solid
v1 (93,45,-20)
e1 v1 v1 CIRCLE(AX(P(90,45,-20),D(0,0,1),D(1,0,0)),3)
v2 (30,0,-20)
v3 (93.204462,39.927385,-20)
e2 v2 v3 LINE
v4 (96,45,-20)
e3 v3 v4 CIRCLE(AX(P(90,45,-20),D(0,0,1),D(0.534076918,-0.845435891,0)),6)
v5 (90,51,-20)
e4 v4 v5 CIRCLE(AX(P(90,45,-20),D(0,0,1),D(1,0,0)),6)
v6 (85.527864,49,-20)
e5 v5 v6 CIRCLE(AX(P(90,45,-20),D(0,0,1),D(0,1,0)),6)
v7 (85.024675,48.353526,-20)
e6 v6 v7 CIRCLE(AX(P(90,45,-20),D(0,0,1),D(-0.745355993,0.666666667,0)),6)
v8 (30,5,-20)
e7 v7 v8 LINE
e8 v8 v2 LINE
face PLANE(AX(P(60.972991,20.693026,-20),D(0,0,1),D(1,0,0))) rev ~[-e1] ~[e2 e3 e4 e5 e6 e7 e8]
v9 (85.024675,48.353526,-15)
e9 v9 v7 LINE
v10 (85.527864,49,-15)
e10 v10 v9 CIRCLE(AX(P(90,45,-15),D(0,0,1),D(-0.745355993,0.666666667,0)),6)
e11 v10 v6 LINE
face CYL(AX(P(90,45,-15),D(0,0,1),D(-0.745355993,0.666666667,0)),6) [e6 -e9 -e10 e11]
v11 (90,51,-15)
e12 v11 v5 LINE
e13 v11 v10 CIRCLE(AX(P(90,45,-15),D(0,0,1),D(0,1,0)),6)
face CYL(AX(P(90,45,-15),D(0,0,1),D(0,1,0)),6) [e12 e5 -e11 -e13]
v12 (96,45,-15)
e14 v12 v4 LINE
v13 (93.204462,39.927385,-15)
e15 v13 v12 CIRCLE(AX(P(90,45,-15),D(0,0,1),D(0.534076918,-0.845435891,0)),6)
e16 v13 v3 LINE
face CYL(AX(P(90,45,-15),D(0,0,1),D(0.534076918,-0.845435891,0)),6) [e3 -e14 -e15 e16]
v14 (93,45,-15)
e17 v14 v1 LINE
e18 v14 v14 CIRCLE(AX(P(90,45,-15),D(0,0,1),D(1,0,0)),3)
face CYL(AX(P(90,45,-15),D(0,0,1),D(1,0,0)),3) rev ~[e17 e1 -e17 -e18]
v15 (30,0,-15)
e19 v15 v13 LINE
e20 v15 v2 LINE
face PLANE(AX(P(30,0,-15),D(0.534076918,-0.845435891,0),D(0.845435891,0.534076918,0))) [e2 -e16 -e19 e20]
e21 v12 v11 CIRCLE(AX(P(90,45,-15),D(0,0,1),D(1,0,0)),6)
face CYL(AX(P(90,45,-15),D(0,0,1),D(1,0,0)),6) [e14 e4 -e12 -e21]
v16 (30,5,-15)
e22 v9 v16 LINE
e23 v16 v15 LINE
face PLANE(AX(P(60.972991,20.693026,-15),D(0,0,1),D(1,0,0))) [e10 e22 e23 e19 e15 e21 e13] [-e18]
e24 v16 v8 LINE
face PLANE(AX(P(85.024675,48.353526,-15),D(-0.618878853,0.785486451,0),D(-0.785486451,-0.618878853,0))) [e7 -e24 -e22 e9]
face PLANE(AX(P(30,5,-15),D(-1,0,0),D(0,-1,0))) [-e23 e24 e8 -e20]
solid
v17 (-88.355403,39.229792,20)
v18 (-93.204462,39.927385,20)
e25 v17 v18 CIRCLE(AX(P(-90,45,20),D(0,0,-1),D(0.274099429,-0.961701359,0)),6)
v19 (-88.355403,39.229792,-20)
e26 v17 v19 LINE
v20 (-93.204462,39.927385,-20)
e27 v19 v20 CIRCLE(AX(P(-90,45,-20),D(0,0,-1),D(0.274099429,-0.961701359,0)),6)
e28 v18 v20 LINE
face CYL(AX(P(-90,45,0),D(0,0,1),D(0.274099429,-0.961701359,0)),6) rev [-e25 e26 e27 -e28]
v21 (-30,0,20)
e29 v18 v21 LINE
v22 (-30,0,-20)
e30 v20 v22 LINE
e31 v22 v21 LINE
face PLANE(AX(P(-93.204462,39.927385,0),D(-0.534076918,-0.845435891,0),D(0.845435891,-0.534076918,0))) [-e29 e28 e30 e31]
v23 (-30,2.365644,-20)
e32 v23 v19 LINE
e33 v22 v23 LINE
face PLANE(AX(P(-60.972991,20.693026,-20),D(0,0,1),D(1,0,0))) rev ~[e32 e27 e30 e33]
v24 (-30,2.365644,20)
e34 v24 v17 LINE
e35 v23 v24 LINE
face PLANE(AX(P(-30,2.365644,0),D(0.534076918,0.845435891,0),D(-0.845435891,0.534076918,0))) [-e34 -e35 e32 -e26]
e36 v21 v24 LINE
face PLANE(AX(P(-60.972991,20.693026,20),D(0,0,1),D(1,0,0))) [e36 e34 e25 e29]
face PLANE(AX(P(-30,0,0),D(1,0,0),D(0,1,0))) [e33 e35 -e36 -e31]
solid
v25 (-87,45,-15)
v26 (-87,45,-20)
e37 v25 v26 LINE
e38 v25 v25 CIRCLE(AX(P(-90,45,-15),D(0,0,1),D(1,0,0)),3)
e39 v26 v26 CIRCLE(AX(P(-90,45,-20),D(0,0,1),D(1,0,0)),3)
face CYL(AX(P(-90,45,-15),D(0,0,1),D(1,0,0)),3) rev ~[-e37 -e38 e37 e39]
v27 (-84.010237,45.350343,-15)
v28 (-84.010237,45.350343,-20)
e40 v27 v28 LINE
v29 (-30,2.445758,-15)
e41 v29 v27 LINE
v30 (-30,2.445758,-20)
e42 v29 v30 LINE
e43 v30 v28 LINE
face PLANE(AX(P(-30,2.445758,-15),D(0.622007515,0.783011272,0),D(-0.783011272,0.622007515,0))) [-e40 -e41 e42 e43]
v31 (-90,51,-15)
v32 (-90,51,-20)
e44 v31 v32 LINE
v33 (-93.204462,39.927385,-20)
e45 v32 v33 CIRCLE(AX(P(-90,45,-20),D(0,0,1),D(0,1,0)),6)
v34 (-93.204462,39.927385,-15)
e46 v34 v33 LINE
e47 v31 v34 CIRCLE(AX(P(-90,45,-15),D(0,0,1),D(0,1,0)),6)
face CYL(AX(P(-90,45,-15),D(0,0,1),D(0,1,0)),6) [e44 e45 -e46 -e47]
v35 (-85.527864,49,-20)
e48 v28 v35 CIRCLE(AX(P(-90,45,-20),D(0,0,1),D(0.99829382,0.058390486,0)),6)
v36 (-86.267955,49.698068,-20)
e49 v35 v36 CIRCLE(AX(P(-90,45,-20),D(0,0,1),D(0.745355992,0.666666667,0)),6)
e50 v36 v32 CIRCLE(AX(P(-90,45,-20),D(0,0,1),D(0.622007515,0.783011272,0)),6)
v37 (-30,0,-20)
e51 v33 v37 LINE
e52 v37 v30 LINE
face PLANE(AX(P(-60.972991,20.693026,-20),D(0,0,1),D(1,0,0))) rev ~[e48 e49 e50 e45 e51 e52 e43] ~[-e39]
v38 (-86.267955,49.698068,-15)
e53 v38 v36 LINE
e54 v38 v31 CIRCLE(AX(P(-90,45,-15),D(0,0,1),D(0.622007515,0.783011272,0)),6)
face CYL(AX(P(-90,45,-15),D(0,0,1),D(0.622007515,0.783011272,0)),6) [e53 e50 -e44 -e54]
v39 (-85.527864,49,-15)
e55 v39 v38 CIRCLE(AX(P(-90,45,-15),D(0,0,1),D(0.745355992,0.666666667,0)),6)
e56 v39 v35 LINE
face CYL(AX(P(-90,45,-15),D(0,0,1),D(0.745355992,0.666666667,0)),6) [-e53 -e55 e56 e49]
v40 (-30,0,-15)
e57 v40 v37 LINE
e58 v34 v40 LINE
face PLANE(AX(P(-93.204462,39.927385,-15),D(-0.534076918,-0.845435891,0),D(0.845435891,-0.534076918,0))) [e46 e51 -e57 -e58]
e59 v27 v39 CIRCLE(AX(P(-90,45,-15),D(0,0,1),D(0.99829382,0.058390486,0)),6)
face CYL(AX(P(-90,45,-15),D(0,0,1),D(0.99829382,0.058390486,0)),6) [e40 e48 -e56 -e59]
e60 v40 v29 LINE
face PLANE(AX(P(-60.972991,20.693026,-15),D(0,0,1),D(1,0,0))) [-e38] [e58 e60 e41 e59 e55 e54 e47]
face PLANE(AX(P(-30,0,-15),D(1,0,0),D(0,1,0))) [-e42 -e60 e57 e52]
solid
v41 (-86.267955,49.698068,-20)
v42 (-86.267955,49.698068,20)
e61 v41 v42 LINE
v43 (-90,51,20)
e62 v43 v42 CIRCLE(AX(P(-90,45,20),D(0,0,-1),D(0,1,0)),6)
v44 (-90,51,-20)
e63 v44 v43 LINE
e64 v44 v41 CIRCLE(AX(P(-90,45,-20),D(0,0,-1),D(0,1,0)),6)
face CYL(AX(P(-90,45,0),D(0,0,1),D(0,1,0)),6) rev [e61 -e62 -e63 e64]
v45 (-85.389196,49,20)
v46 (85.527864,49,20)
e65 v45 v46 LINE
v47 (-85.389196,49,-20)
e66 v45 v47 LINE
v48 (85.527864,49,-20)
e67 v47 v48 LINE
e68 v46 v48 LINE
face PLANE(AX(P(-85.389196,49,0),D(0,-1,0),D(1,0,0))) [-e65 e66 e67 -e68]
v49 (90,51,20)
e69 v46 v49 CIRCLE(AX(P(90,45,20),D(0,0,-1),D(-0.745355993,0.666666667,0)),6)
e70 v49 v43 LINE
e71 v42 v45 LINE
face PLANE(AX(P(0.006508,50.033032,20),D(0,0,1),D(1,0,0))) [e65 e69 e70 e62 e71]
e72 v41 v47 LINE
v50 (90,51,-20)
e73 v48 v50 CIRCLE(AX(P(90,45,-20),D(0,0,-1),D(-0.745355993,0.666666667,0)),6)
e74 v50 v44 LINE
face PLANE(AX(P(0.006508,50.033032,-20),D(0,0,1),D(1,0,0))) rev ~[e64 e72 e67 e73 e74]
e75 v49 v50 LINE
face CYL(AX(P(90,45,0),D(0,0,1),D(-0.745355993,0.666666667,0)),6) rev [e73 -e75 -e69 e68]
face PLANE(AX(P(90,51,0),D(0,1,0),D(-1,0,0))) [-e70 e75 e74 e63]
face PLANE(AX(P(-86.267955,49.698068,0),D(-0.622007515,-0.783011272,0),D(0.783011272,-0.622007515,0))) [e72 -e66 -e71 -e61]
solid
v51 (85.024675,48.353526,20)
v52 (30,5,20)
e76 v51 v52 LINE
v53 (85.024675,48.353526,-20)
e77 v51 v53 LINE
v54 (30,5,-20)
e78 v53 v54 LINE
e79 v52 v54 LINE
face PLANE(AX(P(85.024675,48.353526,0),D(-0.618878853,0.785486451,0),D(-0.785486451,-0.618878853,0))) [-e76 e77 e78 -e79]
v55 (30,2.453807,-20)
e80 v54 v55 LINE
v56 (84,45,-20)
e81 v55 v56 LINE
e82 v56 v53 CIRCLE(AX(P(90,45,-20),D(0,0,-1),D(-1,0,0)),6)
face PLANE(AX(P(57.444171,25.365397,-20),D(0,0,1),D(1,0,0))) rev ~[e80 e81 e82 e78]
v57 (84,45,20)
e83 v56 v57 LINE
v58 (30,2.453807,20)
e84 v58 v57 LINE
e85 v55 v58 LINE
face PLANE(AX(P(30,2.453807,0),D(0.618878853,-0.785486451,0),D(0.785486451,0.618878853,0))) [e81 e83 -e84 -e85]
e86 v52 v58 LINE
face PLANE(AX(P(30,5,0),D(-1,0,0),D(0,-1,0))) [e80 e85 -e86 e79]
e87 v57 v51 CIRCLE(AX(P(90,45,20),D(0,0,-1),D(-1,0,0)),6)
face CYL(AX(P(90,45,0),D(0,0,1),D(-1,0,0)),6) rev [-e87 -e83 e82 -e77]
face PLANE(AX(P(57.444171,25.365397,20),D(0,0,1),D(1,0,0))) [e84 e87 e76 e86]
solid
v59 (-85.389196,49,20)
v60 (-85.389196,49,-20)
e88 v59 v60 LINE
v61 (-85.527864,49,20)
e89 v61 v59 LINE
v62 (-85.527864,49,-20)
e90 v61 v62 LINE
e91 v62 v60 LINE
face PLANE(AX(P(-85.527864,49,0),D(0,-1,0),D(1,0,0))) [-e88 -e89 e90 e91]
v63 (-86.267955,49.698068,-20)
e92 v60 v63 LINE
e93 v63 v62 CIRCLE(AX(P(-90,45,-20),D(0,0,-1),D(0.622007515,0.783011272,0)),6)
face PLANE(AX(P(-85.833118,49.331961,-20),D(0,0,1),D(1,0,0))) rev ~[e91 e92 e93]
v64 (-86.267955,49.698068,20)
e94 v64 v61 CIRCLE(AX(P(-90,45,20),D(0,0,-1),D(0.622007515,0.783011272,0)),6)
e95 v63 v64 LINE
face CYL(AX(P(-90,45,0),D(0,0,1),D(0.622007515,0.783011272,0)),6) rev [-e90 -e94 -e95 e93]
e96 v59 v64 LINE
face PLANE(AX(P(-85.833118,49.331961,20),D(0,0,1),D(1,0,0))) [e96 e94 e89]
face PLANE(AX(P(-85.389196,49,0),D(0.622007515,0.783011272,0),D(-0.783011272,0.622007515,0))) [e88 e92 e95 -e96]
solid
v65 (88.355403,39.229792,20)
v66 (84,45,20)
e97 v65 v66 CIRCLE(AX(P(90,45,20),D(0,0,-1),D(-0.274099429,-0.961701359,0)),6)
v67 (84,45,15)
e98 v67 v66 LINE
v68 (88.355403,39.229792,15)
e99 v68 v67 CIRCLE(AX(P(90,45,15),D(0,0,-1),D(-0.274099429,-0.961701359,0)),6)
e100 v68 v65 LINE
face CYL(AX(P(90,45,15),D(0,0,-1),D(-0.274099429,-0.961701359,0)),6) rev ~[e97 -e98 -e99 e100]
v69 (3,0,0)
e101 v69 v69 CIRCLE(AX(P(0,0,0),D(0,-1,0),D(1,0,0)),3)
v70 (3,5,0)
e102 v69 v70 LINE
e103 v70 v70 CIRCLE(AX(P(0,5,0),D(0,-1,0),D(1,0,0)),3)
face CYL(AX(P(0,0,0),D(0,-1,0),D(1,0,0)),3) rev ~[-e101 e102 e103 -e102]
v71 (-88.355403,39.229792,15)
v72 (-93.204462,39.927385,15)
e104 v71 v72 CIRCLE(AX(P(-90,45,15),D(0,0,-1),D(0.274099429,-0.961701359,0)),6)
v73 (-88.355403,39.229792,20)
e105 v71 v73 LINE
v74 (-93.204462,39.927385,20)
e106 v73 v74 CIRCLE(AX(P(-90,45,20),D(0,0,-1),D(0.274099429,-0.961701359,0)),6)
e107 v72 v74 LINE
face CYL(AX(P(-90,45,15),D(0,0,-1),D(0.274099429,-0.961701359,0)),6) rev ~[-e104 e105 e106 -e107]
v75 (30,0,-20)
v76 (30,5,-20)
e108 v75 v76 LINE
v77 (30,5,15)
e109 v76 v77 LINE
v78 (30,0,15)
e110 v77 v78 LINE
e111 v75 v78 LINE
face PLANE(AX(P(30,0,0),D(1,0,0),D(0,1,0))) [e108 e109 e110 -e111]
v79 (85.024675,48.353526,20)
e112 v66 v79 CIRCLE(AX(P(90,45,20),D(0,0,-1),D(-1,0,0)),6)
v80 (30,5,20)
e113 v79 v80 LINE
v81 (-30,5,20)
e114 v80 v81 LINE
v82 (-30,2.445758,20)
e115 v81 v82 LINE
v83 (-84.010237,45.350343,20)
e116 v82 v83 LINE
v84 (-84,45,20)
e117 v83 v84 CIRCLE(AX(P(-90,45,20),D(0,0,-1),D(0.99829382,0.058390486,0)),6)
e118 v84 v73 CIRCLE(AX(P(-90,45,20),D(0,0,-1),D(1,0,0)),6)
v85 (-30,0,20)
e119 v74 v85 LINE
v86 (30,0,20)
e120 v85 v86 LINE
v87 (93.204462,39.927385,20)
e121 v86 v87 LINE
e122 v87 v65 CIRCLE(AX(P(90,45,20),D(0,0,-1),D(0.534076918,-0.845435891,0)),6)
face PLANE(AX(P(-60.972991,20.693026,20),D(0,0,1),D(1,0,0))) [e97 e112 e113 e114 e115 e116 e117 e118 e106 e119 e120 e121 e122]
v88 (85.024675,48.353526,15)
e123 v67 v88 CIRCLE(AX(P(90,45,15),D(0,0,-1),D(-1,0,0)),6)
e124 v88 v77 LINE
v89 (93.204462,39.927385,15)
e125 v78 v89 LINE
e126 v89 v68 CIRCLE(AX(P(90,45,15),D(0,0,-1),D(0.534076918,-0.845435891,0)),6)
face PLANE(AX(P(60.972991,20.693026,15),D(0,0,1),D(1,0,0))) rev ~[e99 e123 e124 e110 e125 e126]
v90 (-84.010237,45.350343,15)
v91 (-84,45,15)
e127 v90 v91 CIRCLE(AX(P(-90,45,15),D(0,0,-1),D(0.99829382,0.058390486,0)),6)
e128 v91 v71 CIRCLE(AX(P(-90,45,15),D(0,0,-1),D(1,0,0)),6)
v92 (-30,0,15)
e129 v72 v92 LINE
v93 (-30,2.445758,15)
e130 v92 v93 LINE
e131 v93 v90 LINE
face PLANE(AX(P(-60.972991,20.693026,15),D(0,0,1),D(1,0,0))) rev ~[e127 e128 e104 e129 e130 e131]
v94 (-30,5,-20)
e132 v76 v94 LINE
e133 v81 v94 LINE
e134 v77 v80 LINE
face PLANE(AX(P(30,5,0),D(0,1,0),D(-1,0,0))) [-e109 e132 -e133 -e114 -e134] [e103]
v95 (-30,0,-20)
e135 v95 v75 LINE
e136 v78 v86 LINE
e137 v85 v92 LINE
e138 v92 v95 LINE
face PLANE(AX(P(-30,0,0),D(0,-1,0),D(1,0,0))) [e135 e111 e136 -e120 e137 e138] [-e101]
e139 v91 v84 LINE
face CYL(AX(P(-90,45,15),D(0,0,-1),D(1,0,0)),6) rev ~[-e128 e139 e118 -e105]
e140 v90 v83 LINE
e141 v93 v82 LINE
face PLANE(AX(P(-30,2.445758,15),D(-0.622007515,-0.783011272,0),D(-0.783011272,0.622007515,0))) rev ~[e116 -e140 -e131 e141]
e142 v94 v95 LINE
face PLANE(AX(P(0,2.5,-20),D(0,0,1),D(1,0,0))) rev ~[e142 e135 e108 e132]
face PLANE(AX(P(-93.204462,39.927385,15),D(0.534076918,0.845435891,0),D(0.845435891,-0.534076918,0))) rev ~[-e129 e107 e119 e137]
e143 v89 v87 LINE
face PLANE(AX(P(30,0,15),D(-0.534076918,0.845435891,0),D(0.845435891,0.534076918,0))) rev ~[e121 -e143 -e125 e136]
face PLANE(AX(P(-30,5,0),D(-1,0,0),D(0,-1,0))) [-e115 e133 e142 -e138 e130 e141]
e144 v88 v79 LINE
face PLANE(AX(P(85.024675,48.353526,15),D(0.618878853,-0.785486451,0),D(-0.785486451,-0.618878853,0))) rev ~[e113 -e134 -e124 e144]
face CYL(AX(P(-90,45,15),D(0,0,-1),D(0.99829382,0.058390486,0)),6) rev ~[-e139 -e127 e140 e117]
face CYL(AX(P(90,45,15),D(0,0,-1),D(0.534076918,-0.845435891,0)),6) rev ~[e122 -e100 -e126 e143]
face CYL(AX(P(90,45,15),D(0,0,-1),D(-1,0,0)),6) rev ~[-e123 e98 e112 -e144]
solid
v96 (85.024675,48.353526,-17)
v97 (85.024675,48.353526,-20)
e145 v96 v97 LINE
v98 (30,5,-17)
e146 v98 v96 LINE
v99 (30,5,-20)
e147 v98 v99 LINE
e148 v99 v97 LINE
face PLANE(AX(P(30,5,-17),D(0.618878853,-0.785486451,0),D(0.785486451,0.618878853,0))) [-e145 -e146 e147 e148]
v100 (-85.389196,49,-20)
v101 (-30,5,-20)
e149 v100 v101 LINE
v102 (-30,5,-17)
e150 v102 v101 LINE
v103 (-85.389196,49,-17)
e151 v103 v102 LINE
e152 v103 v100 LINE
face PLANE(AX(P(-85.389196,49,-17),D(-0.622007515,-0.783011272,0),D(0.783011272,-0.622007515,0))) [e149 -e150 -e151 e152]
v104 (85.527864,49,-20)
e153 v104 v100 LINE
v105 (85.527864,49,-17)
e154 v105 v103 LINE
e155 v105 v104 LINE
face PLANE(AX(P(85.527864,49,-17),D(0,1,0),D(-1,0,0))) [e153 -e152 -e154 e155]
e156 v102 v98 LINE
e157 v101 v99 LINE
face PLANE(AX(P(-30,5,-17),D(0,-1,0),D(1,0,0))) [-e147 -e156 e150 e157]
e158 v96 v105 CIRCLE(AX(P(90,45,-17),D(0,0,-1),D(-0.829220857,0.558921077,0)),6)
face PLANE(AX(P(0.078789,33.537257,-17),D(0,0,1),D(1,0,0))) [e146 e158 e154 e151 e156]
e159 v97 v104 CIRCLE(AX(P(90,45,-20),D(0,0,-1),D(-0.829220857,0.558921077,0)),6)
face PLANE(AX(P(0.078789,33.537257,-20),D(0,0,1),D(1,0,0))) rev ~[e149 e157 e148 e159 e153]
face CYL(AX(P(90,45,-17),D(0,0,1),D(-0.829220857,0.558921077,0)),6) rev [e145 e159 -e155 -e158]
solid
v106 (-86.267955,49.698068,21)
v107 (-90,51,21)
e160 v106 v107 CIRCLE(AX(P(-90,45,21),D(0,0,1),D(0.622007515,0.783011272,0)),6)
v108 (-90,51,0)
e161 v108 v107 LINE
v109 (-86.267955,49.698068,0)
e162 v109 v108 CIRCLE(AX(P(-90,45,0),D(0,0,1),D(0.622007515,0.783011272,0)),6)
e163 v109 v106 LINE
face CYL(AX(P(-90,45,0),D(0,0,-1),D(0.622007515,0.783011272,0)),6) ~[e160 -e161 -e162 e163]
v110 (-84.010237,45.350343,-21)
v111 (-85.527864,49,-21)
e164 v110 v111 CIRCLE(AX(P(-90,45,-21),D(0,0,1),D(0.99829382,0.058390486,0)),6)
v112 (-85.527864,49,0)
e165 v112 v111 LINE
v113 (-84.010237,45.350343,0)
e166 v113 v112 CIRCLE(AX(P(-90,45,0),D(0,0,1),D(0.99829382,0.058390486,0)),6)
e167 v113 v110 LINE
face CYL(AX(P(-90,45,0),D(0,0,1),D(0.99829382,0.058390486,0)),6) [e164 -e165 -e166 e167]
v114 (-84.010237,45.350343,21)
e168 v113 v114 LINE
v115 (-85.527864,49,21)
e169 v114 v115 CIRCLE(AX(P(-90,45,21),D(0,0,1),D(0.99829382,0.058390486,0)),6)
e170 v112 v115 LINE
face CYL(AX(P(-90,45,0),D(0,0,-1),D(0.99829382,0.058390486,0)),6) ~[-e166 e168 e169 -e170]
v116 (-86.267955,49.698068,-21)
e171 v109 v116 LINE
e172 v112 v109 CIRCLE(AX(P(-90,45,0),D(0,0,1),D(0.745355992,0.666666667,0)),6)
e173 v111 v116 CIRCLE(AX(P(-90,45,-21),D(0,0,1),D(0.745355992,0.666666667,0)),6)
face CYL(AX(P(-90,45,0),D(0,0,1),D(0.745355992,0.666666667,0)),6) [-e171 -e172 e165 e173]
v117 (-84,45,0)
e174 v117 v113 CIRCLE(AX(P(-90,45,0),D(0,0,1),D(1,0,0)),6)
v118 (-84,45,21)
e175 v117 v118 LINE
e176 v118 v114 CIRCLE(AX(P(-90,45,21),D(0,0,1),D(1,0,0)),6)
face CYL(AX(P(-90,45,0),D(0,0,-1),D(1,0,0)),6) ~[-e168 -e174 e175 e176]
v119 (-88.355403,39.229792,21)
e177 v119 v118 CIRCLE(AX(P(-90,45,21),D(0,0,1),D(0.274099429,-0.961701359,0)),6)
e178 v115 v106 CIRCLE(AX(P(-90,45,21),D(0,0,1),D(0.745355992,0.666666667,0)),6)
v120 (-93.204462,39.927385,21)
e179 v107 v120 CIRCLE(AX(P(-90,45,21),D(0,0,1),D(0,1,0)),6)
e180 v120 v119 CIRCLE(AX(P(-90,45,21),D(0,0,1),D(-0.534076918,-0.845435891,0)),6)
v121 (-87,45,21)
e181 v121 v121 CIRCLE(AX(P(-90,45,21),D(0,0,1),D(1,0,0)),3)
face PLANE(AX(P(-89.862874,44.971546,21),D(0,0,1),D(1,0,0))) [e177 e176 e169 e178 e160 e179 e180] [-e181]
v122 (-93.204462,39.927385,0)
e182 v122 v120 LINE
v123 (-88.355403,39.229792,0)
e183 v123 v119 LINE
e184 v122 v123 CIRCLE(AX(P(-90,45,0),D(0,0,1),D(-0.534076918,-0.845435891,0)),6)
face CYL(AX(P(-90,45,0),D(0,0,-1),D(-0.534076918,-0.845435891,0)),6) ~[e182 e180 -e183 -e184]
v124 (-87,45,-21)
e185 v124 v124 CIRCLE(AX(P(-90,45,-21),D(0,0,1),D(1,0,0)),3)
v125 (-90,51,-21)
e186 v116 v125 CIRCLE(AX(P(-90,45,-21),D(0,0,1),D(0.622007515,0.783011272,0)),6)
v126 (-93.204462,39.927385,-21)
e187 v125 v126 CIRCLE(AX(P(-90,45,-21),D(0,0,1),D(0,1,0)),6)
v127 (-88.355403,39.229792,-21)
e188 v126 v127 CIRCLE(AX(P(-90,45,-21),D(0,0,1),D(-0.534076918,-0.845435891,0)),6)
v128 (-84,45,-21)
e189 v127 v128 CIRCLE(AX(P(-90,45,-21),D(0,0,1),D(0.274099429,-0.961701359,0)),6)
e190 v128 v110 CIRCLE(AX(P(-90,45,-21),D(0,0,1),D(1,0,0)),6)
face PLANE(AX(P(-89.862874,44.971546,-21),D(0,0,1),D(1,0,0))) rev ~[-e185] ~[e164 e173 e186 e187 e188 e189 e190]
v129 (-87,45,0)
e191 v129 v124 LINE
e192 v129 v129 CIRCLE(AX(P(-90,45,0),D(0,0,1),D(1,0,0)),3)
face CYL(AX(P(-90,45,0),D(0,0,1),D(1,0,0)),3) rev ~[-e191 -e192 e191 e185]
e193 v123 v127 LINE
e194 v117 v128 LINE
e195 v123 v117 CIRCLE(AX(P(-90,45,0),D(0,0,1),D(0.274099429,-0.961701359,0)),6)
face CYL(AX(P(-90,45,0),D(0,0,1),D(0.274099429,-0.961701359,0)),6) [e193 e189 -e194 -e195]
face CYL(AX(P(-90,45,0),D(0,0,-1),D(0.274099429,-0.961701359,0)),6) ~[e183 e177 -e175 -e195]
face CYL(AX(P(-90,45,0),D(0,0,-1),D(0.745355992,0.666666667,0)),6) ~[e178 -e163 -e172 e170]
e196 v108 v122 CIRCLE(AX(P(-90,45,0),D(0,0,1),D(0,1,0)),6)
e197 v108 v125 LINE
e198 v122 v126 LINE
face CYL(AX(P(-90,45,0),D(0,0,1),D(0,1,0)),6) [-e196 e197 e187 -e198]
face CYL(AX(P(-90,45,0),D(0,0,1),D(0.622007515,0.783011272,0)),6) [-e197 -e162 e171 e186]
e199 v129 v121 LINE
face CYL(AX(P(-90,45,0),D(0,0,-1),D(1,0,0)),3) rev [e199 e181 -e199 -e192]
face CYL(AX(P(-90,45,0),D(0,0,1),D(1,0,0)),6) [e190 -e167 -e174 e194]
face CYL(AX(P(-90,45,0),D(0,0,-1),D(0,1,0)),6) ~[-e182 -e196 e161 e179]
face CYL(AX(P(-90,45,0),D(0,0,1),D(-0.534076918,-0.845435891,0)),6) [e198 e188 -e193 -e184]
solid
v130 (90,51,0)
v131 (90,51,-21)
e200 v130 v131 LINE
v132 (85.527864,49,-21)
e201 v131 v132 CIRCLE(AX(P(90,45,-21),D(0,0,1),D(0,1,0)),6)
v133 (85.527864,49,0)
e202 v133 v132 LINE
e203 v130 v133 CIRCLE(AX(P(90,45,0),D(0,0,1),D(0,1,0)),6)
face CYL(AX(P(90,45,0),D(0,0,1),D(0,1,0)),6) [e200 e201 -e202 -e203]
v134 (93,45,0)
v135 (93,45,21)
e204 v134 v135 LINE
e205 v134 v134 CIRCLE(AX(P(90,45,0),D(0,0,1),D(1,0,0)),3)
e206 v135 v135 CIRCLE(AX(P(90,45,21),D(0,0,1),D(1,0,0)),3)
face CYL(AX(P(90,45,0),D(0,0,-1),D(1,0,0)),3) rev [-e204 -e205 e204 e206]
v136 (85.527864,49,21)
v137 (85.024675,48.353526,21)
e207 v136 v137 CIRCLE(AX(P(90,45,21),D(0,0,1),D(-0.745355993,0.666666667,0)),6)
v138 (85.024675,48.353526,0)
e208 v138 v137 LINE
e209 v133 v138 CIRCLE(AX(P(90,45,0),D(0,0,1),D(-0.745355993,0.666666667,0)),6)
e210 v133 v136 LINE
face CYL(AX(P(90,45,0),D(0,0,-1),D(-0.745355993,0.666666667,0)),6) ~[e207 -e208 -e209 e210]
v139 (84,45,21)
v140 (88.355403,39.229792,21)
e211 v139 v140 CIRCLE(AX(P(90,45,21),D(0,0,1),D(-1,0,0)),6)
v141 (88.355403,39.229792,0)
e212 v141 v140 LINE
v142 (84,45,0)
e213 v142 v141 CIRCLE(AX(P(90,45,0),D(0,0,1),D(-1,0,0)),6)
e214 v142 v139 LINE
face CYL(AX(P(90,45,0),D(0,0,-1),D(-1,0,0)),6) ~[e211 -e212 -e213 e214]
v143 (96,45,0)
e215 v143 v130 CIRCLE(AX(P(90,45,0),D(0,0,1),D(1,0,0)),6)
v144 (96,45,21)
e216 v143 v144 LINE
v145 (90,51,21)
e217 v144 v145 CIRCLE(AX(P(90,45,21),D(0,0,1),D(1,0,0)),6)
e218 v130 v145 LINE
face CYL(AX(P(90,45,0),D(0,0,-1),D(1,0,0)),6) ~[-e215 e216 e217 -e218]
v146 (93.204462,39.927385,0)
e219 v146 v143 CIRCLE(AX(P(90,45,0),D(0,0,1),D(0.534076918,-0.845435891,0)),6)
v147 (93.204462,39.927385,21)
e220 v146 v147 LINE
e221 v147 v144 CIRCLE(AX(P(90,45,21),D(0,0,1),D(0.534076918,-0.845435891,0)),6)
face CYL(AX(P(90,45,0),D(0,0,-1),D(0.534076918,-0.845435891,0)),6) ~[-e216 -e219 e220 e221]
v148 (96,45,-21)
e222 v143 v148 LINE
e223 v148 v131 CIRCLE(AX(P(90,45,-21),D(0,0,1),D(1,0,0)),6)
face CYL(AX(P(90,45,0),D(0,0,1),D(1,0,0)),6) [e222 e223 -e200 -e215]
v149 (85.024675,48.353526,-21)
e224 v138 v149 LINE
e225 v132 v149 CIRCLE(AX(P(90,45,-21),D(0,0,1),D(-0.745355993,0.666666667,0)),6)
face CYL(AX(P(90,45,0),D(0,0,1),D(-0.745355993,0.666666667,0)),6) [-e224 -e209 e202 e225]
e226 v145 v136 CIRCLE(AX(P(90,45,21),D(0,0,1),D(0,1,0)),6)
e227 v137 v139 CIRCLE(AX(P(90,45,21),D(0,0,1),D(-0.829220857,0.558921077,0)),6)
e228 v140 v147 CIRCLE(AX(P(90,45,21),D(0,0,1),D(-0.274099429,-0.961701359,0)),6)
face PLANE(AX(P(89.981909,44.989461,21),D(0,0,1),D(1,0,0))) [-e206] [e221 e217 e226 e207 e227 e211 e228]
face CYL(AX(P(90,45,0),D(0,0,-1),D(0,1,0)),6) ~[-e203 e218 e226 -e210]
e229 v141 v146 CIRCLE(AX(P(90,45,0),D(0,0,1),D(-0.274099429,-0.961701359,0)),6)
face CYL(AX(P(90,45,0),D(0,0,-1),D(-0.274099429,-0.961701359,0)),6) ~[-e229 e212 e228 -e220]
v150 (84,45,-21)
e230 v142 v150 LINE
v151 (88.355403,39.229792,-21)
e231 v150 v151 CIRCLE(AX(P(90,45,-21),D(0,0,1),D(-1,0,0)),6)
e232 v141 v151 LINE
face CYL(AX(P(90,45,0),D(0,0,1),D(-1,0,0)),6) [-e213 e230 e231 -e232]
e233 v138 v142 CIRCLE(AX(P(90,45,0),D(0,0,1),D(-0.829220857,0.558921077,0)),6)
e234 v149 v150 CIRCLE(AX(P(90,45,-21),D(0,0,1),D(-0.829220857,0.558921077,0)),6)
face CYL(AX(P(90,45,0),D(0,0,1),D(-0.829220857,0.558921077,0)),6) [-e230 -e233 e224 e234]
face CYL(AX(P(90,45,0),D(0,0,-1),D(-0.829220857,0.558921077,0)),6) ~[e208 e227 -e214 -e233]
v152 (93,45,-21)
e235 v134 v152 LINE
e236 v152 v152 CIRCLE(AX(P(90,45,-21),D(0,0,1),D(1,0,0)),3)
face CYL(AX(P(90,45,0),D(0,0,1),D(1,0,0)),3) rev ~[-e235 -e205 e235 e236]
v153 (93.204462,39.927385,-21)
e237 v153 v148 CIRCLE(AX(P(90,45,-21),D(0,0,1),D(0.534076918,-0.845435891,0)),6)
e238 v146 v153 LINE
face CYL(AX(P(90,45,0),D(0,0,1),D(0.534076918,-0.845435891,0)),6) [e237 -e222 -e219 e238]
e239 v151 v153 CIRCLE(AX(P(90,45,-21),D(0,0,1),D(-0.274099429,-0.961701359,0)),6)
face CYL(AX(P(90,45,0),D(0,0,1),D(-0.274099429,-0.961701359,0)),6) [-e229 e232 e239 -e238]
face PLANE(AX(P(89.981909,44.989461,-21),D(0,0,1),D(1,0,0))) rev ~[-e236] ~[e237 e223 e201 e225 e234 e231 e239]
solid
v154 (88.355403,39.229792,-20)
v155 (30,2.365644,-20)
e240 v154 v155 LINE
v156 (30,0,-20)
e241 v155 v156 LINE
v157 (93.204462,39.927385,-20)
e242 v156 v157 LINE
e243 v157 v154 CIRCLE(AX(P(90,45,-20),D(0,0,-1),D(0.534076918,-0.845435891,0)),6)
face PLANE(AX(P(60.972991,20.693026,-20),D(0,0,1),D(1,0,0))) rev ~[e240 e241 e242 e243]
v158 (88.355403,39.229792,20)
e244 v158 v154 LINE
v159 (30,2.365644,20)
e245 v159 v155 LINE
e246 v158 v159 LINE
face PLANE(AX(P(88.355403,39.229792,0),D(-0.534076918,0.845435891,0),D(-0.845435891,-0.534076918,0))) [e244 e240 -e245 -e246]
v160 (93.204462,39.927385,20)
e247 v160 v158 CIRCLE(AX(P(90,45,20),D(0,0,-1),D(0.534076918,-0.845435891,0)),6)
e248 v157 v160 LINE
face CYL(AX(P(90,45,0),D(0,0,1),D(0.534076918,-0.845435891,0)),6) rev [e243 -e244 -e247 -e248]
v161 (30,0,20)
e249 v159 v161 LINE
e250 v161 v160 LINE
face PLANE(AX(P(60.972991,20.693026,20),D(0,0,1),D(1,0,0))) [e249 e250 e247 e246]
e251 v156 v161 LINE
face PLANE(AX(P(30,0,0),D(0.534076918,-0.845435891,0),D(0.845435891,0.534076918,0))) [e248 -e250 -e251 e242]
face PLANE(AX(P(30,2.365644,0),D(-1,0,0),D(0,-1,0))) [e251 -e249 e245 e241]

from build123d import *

# Parameters (mm, degrees)
F1_START      = -15
F0_R          = 3
F1_DEPTH      = 5
F2_DEPTH      = 20
F3_START      = -17
F3_DEPTH      = 3
F4_START      = 15
F4_DEPTH      = 5
F5_DEPTH      = 21
F5_DEPTH_BACK = 21
F6_R          = 3
F7_DEPTH      = 5
F8_DEPTH      = 20
F8_DEPTH_BACK = 20
F9_DEPTH      = 20
F9_DEPTH_BACK = 20


with BuildPart() as f1:
    # F0 (on Top) → F1 (new body)
    with BuildSketch(Plane.XY.offset(F1_START)):
        with BuildLine():
            Line((-93.2044615088, 39.927384655), (-30, 0))
            Line((-30, 0), (-30, 2.3656435948))
            Line((-30, 2.3656435948), (-88.3554034274, 39.2297918483))
            ThreePointArc((-88.3554034274, 39.2297918483), (-90.8543732122, 39.0611409838), (-93.2044615088, 39.927384655))
        make_face()
        with BuildLine():
            Line((-88.3554034274, 39.2297918483), (-30, 2.3656435948))
            Line((-30, 2.3656435948), (-30, 2.4457583538))
            Line((-30, 2.4457583538), (-84.0102370798, 45.3503429172))
            ThreePointArc((-84.0102370798, 45.3503429172), (-84.002559816, 45.175246225), (-84, 45))
            ThreePointArc((-84, 45), (-85.2110763508, 41.3852786716), (-88.3554034274, 39.2297918483))
        make_face()
        with BuildLine():
            ThreePointArc((-90, 51), (-95.7634925206, 46.6679790061), (-93.2044615088, 39.927384655))
            ThreePointArc((-93.2044615088, 39.927384655), (-90.8543732122, 39.0611409838), (-88.3554034274, 39.2297918483))
            ThreePointArc((-88.3554034274, 39.2297918483), (-85.2110763508, 41.3852786716), (-84, 45))
            ThreePointArc((-84, 45), (-84.002559816, 45.175246225), (-84.0102370798, 45.3503429172))
            ThreePointArc((-84.0102370798, 45.3503429172), (-84.4598888798, 47.3037293191), (-85.527864045, 49))
            ThreePointArc((-85.527864045, 49), (-85.8830871702, 49.3647484179), (-86.2679549126, 49.698067631))
            ThreePointArc((-86.2679549126, 49.698067631), (-88.0236910396, 50.6651745686), (-90, 51))
        make_face()
        with Locations((-90, 45)):
            Circle(F0_R, mode=Mode.SUBTRACT)
    extrude(amount=-F1_DEPTH)


with BuildPart() as f1b:
    # F0 (on Top) → F1, piece 2 (new body)
    with BuildSketch(Plane.XY.offset(F1_START)):
        with BuildLine():
            Line((30, 2.3656435948), (30, 0))
            Line((30, 0), (93.2044615088, 39.927384655))
            ThreePointArc((93.2044615088, 39.927384655), (90.8543732122, 39.0611409838), (88.3554034274, 39.2297918483))
            Line((88.3554034274, 39.2297918483), (30, 2.3656435948))
        make_face()
        with BuildLine():
            Line((30, 2.4538071327), (30, 2.3656435948))
            Line((30, 2.3656435948), (88.3554034274, 39.2297918483))
            ThreePointArc((88.3554034274, 39.2297918483), (85.2110763508, 41.3852786716), (84, 45))
            Line((84, 45), (30, 2.4538071327))
        make_face()
        with BuildLine():
            ThreePointArc((88.3554034274, 39.2297918483), (90.8543732122, 39.0611409838), (93.2044615088, 39.927384655))
            ThreePointArc((93.2044615088, 39.927384655), (95.2548439107, 42.1040346215), (96, 45))
            ThreePointArc((96, 45), (94.2426406871, 49.2426406871), (90, 51))
            ThreePointArc((90, 51), (87.5505102572, 50.4772255751), (85.527864045, 49))
            ThreePointArc((85.527864045, 49), (85.2652230991, 48.6853612711), (85.0246748585, 48.3535264627))
            ThreePointArc((85.0246748585, 48.3535264627), (84.261883983, 46.7532896439), (84, 45))
            ThreePointArc((84, 45), (85.2110763508, 41.3852786716), (88.3554034274, 39.2297918483))
        make_face()
        with Locations((90, 45)):
            Circle(F0_R, mode=Mode.SUBTRACT)
        with BuildLine():
            Line((30, 5), (30, 2.4538071327))
            Line((30, 2.4538071327), (84, 45))
            ThreePointArc((84, 45), (84.261883983, 46.7532896439), (85.0246748585, 48.3535264627))
            Line((85.0246748585, 48.3535264627), (30, 5))
        make_face()
    extrude(amount=-F1_DEPTH)


with BuildPart() as f2:
    # F0 (on Top) → F2 (new body, symmetric)
    with BuildSketch(Plane.XY):
        Polygon((-30, 2.3656435948), (-30, 0), (30, 0), (30, 2.3656435948), (30, 2.4538071327), (30, 5), (-30, 5), (-30, 2.4457583538), align=None)
    extrude(amount=F2_DEPTH, both=True)

    # F0 (on Top) → F4 (join)
    with BuildSketch(Plane.XY.offset(F4_START)):
        with BuildLine():
            Line((-93.2044615088, 39.927384655), (-30, 0))
            Line((-30, 0), (-30, 2.3656435948))
            Line((-30, 2.3656435948), (-88.3554034274, 39.2297918483))
            ThreePointArc((-88.3554034274, 39.2297918483), (-90.8543732122, 39.0611409838), (-93.2044615088, 39.927384655))
        make_face()
        with BuildLine():
            Line((30, 2.3656435948), (30, 0))
            Line((30, 0), (93.2044615088, 39.927384655))
            ThreePointArc((93.2044615088, 39.927384655), (90.8543732122, 39.0611409838), (88.3554034274, 39.2297918483))
            Line((88.3554034274, 39.2297918483), (30, 2.3656435948))
        make_face()
        with BuildLine():
            Line((-88.3554034274, 39.2297918483), (-30, 2.3656435948))
            Line((-30, 2.3656435948), (-30, 2.4457583538))
            Line((-30, 2.4457583538), (-84.0102370798, 45.3503429172))
            ThreePointArc((-84.0102370798, 45.3503429172), (-84.002559816, 45.175246225), (-84, 45))
            ThreePointArc((-84, 45), (-85.2110763508, 41.3852786716), (-88.3554034274, 39.2297918483))
        make_face()
        with BuildLine():
            Line((30, 2.4538071327), (30, 2.3656435948))
            Line((30, 2.3656435948), (88.3554034274, 39.2297918483))
            ThreePointArc((88.3554034274, 39.2297918483), (85.2110763508, 41.3852786716), (84, 45))
            Line((84, 45), (30, 2.4538071327))
        make_face()
        with BuildLine():
            Line((30, 5), (30, 2.4538071327))
            Line((30, 2.4538071327), (84, 45))
            ThreePointArc((84, 45), (84.261883983, 46.7532896439), (85.0246748585, 48.3535264627))
            Line((85.0246748585, 48.3535264627), (30, 5))
        make_face()
    extrude(amount=F4_DEPTH)

    # F6 (on Front) → F7 (cut)
    with BuildSketch(Plane.XZ):
        Circle(F6_R)
    extrude(amount=-F7_DEPTH, mode=Mode.SUBTRACT)


with BuildPart() as f3:
    # F0 (on Top) → F3 (new body)
    with BuildSketch(Plane.XY.offset(F3_START)):
        with BuildLine():
            Line((-85.3891957163, 49), (-30, 5))
            Line((-30, 5), (30, 5))
            Line((30, 5), (85.0246748585, 48.3535264627))
            ThreePointArc((85.0246748585, 48.3535264627), (85.2652230991, 48.6853612711), (85.527864045, 49))
            Line((85.527864045, 49), (-85.3891957163, 49))
        make_face()
    extrude(amount=-F3_DEPTH)


with BuildPart() as f5:
    # F0 (on Top) → F5 (new body, two sides)
    with BuildSketch(Plane.XY) as f5_sk:
        with BuildLine():
            ThreePointArc((-90, 51), (-95.7634925206, 46.6679790061), (-93.2044615088, 39.927384655))
            ThreePointArc((-93.2044615088, 39.927384655), (-90.8543732122, 39.0611409838), (-88.3554034274, 39.2297918483))
            ThreePointArc((-88.3554034274, 39.2297918483), (-85.2110763508, 41.3852786716), (-84, 45))
            ThreePointArc((-84, 45), (-84.002559816, 45.175246225), (-84.0102370798, 45.3503429172))
            ThreePointArc((-84.0102370798, 45.3503429172), (-84.4598888798, 47.3037293191), (-85.527864045, 49))
            ThreePointArc((-85.527864045, 49), (-85.8830871702, 49.3647484179), (-86.2679549126, 49.698067631))
            ThreePointArc((-86.2679549126, 49.698067631), (-88.0236910396, 50.6651745686), (-90, 51))
        make_face()
        with Locations((-90, 45)):
            Circle(F0_R, mode=Mode.SUBTRACT)
    extrude(amount=F5_DEPTH)
    extrude(f5_sk.sketch, amount=-F5_DEPTH_BACK)


with BuildPart() as f5b:
    # F0 (on Top) → F5, piece 2 (new body, two sides)
    with BuildSketch(Plane.XY) as f5_2_sk:
        with BuildLine():
            ThreePointArc((88.3554034274, 39.2297918483), (90.8543732122, 39.0611409838), (93.2044615088, 39.927384655))
            ThreePointArc((93.2044615088, 39.927384655), (95.2548439107, 42.1040346215), (96, 45))
            ThreePointArc((96, 45), (94.2426406871, 49.2426406871), (90, 51))
            ThreePointArc((90, 51), (87.5505102572, 50.4772255751), (85.527864045, 49))
            ThreePointArc((85.527864045, 49), (85.2652230991, 48.6853612711), (85.0246748585, 48.3535264627))
            ThreePointArc((85.0246748585, 48.3535264627), (84.261883983, 46.7532896439), (84, 45))
            ThreePointArc((84, 45), (85.2110763508, 41.3852786716), (88.3554034274, 39.2297918483))
        make_face()
        with Locations((90, 45)):
            Circle(F0_R, mode=Mode.SUBTRACT)
    extrude(amount=F5_DEPTH)
    extrude(f5_2_sk.sketch, amount=-F5_DEPTH_BACK)


with BuildPart() as f8:
    # F0 (on Top) → F8 (new body, two sides)
    with BuildSketch(Plane.XY) as f8_sk:
        with BuildLine():
            Line((-93.2044615088, 39.927384655), (-30, 0))
            Line((-30, 0), (-30, 2.3656435948))
            Line((-30, 2.3656435948), (-88.3554034274, 39.2297918483))
            ThreePointArc((-88.3554034274, 39.2297918483), (-90.8543732122, 39.0611409838), (-93.2044615088, 39.927384655))
        make_face()
    extrude(amount=F8_DEPTH)
    extrude(f8_sk.sketch, amount=-F8_DEPTH_BACK)


with BuildPart() as f8b:
    # F0 (on Top) → F8, piece 2 (new body, two sides)
    with BuildSketch(Plane.XY) as f8_2_sk:
        with BuildLine():
            Line((30, 2.3656435948), (30, 0))
            Line((30, 0), (93.2044615088, 39.927384655))
            ThreePointArc((93.2044615088, 39.927384655), (90.8543732122, 39.0611409838), (88.3554034274, 39.2297918483))
            Line((88.3554034274, 39.2297918483), (30, 2.3656435948))
        make_face()
    extrude(amount=F8_DEPTH)
    extrude(f8_2_sk.sketch, amount=-F8_DEPTH_BACK)


with BuildPart() as f8c:
    # F0 (on Top) → F8, piece 3 (new body, two sides)
    with BuildSketch(Plane.XY) as f8_3_sk:
        with BuildLine():
            Line((30, 5), (30, 2.4538071327))
            Line((30, 2.4538071327), (84, 45))
            ThreePointArc((84, 45), (84.261883983, 46.7532896439), (85.0246748585, 48.3535264627))
            Line((85.0246748585, 48.3535264627), (30, 5))
        make_face()
    extrude(amount=F8_DEPTH)
    extrude(f8_3_sk.sketch, amount=-F8_DEPTH_BACK)


with BuildPart() as f8d:
    # F0 (on Top) → F8, piece 4 (new body, two sides)
    with BuildSketch(Plane.XY) as f8_4_sk:
        with BuildLine():
            Line((-85.3891957163, 49), (-86.2679549126, 49.698067631))
            ThreePointArc((-86.2679549126, 49.698067631), (-85.8830871702, 49.3647484179), (-85.527864045, 49))
            Line((-85.527864045, 49), (-85.3891957163, 49))
        make_face()
    extrude(amount=F8_DEPTH)
    extrude(f8_4_sk.sketch, amount=-F8_DEPTH_BACK)


with BuildPart() as f9:
    # F0 (on Top) → F9 (new body, two sides)
    with BuildSketch(Plane.XY) as f9_sk:
        with BuildLine():
            Line((90, 51), (-90, 51))
            ThreePointArc((-90, 51), (-88.0236910396, 50.6651745686), (-86.2679549126, 49.698067631))
            Line((-86.2679549126, 49.698067631), (-85.3891957163, 49))
            Line((-85.3891957163, 49), (85.527864045, 49))
            ThreePointArc((85.527864045, 49), (87.5505102572, 50.4772255751), (90, 51))
        make_face()
    extrude(amount=F9_DEPTH)
    extrude(f9_sk.sketch, amount=-F9_DEPTH_BACK)


solid = Compound([f1.part, f1b.part, f2.part, f3.part, f5.part, f5b.part, f8.part, f8b.part, f8c.part, f8d.part, f9.part])
